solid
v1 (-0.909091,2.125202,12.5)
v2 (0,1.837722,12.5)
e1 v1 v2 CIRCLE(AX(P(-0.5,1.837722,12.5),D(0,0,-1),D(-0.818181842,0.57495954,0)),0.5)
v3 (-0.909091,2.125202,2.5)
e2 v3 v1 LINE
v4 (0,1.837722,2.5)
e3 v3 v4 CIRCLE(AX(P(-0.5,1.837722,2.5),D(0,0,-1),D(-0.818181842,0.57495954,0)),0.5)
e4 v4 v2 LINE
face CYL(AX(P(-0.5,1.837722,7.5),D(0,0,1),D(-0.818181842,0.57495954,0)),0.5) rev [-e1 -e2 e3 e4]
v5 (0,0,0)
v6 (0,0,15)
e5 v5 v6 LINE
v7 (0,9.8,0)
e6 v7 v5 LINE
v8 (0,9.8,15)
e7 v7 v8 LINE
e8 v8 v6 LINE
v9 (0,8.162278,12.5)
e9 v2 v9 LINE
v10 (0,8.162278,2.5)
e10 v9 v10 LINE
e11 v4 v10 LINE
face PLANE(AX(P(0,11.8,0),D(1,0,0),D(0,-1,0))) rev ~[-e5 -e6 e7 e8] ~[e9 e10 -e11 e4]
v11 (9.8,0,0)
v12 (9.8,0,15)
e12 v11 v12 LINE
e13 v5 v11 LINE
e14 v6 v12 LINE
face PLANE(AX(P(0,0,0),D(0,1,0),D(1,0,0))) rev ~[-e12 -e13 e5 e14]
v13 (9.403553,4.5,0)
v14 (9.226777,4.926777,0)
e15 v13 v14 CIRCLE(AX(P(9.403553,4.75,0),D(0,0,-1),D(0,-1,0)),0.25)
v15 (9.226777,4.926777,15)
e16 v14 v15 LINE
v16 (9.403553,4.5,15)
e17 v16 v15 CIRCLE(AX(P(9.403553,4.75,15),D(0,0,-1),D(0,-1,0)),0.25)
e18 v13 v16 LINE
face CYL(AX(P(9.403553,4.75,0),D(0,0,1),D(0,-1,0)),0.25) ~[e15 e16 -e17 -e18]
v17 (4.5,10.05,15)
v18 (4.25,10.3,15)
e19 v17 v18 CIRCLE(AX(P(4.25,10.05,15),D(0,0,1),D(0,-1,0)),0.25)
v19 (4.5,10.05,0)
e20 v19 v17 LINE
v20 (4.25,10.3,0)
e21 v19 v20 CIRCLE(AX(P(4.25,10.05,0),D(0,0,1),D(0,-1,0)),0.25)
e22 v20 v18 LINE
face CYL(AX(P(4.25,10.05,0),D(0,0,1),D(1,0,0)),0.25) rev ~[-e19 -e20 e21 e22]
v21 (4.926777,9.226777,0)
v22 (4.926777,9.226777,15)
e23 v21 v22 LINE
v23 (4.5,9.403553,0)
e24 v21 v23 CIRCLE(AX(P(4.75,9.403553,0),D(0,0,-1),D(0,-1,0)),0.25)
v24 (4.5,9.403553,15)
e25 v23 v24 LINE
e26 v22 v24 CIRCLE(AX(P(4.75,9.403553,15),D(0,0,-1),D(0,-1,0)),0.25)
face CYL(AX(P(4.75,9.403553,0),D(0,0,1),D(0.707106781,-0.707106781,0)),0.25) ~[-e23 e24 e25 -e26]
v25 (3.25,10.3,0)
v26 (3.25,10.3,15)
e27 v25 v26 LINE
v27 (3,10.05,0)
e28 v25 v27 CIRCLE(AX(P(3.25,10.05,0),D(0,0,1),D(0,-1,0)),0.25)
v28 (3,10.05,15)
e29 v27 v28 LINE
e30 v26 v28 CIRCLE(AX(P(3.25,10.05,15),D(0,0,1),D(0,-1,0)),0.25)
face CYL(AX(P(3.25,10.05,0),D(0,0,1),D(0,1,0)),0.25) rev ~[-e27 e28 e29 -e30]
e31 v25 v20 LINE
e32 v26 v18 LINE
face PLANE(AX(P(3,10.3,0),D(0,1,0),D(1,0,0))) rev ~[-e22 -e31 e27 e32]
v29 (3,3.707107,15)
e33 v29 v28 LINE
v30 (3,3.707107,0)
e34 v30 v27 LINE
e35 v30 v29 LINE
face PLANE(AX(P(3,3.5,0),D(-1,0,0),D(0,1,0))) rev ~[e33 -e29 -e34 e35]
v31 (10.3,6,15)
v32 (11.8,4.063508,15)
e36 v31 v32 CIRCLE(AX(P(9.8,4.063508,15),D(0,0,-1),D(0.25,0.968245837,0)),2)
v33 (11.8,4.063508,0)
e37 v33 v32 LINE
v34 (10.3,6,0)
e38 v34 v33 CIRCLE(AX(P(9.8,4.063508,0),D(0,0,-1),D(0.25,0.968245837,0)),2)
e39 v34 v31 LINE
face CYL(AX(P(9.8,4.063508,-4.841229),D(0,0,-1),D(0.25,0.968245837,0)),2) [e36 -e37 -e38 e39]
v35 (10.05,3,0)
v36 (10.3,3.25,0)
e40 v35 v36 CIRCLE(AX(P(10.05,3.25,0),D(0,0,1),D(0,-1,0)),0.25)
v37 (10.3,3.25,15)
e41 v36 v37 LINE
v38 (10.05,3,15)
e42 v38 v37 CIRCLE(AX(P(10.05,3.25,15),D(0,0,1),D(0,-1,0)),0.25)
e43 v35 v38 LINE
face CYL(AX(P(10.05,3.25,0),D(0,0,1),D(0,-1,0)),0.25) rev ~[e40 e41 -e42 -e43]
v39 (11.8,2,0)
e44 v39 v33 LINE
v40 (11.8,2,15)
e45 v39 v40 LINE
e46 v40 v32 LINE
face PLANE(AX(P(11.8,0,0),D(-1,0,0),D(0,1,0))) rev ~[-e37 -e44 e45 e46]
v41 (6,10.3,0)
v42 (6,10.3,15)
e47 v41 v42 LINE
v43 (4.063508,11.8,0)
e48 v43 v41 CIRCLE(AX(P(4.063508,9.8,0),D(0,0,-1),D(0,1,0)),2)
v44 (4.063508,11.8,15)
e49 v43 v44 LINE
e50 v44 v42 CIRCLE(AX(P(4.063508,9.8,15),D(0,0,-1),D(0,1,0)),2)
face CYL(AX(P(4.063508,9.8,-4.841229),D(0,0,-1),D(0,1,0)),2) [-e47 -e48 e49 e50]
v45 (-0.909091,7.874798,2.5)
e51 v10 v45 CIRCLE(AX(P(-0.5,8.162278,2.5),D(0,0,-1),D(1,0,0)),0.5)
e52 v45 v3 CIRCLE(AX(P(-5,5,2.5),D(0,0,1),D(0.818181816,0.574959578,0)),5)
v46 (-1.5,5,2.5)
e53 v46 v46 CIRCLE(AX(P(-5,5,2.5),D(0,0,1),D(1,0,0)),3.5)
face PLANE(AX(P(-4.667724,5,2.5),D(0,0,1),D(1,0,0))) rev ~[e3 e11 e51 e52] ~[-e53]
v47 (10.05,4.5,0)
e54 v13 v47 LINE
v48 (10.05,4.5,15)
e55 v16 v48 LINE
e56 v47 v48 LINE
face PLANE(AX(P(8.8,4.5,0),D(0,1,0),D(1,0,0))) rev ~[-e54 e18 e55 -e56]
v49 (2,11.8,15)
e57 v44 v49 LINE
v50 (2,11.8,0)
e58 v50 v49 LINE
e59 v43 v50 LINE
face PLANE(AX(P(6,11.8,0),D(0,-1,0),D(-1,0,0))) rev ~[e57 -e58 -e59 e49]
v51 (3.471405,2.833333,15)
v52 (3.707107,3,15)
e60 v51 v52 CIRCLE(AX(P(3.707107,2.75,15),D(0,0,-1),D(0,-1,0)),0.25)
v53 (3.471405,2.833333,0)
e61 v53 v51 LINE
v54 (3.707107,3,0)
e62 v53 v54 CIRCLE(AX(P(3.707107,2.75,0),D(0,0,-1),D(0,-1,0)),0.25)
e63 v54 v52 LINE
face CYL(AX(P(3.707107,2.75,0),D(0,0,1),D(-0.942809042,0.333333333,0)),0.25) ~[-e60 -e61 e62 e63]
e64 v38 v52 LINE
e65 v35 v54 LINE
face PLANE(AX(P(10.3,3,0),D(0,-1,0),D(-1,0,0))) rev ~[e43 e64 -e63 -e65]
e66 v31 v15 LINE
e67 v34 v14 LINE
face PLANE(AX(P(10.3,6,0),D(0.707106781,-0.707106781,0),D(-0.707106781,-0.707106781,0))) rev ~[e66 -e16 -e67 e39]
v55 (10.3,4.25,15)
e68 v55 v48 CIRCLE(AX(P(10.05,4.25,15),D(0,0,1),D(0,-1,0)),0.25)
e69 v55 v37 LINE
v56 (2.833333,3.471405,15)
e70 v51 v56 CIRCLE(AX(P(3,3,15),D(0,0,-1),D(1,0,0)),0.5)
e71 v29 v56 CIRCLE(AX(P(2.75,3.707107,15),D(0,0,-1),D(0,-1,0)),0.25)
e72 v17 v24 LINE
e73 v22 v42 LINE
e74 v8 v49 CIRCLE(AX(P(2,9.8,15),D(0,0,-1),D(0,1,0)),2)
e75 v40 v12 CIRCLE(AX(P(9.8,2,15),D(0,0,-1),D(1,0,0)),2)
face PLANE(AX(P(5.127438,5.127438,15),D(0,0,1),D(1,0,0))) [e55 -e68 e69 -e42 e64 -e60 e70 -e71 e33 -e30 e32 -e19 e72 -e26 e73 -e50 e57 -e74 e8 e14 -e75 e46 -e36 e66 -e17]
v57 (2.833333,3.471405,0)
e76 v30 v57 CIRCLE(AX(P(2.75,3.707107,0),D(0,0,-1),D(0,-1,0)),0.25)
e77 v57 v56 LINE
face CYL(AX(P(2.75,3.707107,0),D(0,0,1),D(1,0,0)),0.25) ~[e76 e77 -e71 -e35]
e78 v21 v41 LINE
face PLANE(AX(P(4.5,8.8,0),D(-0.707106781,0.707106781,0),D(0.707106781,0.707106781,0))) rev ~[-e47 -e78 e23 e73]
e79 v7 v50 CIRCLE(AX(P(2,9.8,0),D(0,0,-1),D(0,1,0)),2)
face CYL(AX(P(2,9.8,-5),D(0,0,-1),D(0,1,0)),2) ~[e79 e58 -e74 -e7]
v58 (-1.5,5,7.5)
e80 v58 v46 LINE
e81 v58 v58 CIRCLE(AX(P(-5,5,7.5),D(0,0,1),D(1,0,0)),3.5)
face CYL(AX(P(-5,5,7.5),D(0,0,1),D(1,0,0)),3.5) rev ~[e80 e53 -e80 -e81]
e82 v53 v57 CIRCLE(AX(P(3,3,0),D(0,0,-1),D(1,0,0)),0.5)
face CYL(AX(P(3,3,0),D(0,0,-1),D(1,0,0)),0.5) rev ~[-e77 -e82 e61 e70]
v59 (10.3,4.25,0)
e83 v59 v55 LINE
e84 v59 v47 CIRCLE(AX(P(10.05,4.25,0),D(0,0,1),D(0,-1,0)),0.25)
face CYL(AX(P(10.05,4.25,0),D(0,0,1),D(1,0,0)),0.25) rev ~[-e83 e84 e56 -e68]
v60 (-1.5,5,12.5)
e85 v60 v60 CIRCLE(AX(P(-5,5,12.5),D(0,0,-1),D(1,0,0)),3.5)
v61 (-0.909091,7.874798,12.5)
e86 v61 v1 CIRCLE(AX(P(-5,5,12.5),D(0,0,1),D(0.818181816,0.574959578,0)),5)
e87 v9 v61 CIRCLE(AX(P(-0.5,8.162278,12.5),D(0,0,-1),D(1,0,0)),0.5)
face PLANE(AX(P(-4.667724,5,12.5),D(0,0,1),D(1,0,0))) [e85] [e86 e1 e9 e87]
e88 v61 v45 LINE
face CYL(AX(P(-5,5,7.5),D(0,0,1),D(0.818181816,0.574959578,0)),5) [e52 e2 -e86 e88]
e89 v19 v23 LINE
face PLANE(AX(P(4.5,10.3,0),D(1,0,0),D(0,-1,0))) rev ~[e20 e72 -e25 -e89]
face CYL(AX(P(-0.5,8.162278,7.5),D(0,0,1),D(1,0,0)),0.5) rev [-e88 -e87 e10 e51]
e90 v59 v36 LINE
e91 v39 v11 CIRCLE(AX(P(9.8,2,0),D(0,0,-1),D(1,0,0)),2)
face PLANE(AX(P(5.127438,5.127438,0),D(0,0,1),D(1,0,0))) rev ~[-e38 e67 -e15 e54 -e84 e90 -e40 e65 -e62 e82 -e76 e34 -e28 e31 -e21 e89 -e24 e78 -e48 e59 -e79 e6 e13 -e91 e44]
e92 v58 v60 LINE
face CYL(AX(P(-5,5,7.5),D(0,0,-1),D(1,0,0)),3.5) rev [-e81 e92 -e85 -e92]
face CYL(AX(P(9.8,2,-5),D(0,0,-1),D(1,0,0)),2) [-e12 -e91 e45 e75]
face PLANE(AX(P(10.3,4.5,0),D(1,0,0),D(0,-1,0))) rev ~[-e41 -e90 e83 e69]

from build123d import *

# Parameters (mm, degrees)
F1_DEPTH      = 15
F2_T1_DEPTH   = 25
F2_T3_DEPTH   = 24.6824583655
F3_R          = 0.25
F6_DEPTH      = 5
F7_R          = 3.5
F8_DEPTH      = 7.501
F8_DEPTH_BACK = 7.501


# Not quite as in the source:
# - a fillet or chamfer that OpenCascade refuses, or shapes differently, is made with other operations: its cross-section is extruded or revolved along the edge and cut away or added
# - a feature names something its author has since deleted; it is built from what else it names


with BuildPart() as f1:
    # F0 (on Top) → F1 (new body)
    with BuildSketch(Plane.XY):
        with BuildLine():
            Line((3, 11.8), (0, 11.8))
            Line((0, 11.8), (0, 0))
            Line((0, 0), (11.8, 0))
            Line((11.8, 0), (11.8, 3))
            Line((11.8, 3), (11.8, 6))
            Line((11.8, 6), (10.3, 6))
            Line((10.3, 6), (8.8, 4.5))
            Line((8.8, 4.5), (10.3, 4.5))
            Line((10.3, 4.5), (10.3, 3))
            Line((10.3, 3), (3.5, 3))
            ThreePointArc((3.5, 3), (2.6464466094, 2.6464466094), (3, 3.5))
            Line((3, 3.5), (3, 10.3))
            Line((3, 10.3), (4.5, 10.3))
            Line((4.5, 10.3), (4.5, 8.8))
            Line((4.5, 8.8), (6, 10.3))
            Line((6, 10.3), (6, 11.8))
            Line((6, 11.8), (3, 11.8))
        make_face()
    extrude(amount=F1_DEPTH)

    # F2: fillet of radius 2 on 4 edges, made by hand

    # F2_s2 → F2_t1 (cut)
    with BuildSketch(Plane.XY.offset(-5)):
        with BuildLine():
            ThreePointArc((2, 11.8), (0.5857864376, 11.2142135624), (0, 9.8))
            Line((0, 9.8), (0, 11.8))
            Line((0, 11.8), (2, 11.8))
        make_face()
        with BuildLine():
            ThreePointArc((11.8, 2), (11.2142135624, 0.5857864376), (9.8, 0))
            Line((9.8, 0), (11.8, 0))
            Line((11.8, 0), (11.8, 2))
        make_face()
    extrude(amount=F2_T1_DEPTH, mode=Mode.SUBTRACT)

    # F2_s4 → F2_t3 (cut)
    with BuildSketch(Plane.XY.offset(-4.8412291828)):
        with BuildLine():
            ThreePointArc((4.0635083269, 11.8), (5.2882531983, 11.3811388301), (6, 10.3))
            Line((6, 10.3), (6, 11.8))
            Line((6, 11.8), (4.0635083269, 11.8))
        make_face()
        with BuildLine():
            ThreePointArc((10.3, 6), (11.3811388301, 5.2882531983), (11.8, 4.0635083269))
            Line((11.8, 4.0635083269), (11.8, 6))
            Line((11.8, 6), (10.3, 6))
        make_face()
    extrude(amount=F2_T3_DEPTH, mode=Mode.SUBTRACT)

    # F3
    f3_edges = [f1.edges().sort_by_distance(p)[0] for p in [
        (3, 10.3, 7.5),
        (4.5, 10.3, 7.5),
        (4.5, 8.8, 7.5),
        (3, 3.5, 7.5),
        (3.5, 3, 7.5),
        (10.3, 4.5, 7.5),
        (8.8, 4.5, 7.5),
        (10.3, 3, 7.5),
    ]]
    fillet(f3_edges, radius=F3_R)

    # F5 (on mid) → F6 (join, symmetric)
    with BuildSketch(Plane.XY.offset(7.5)):
        with BuildLine():
            ThreePointArc((-0.9090909212, 2.1252021099), (-0.2326870569, 3.4924432671), (0, 5))
            ThreePointArc((0, 5), (-0.2326870569, 6.5075567329), (-0.9090909212, 7.8747978901))
            ThreePointArc((-0.9090909212, 7.8747978901), (-10, 5), (-0.9090909212, 2.1252021099))
        make_face()
        with BuildLine():
            Line((0, 1.8377223398), (0, 5))
            ThreePointArc((0, 5), (-0.2326870569, 3.4924432671), (-0.9090909212, 2.1252021099))
            ThreePointArc((-0.9090909212, 2.1252021099), (-0.3492443377, 2.3144536376), (0, 1.8377223398))
        make_face()
        with BuildLine():
            ThreePointArc((-0.9090909212, 7.8747978901), (-0.2326870569, 6.5075567329), (0, 5))
            Line((0, 5), (0, 8.1622776602))
            ThreePointArc((0, 8.1622776602), (-0.3492443377, 7.6855463624), (-0.9090909212, 7.8747978901))
        make_face()
    extrude(amount=F6_DEPTH, both=True)

    # F7 (on mid) → F8 (cut, two sides)
    with BuildSketch(Plane.XY.offset(7.5)) as f8_sk:
        with Locations((-5, 5)):
            Circle(F7_R)
    extrude(amount=-F8_DEPTH, mode=Mode.SUBTRACT)
    extrude(f8_sk.sketch, amount=F8_DEPTH_BACK, mode=Mode.SUBTRACT)


solid = f1.part
